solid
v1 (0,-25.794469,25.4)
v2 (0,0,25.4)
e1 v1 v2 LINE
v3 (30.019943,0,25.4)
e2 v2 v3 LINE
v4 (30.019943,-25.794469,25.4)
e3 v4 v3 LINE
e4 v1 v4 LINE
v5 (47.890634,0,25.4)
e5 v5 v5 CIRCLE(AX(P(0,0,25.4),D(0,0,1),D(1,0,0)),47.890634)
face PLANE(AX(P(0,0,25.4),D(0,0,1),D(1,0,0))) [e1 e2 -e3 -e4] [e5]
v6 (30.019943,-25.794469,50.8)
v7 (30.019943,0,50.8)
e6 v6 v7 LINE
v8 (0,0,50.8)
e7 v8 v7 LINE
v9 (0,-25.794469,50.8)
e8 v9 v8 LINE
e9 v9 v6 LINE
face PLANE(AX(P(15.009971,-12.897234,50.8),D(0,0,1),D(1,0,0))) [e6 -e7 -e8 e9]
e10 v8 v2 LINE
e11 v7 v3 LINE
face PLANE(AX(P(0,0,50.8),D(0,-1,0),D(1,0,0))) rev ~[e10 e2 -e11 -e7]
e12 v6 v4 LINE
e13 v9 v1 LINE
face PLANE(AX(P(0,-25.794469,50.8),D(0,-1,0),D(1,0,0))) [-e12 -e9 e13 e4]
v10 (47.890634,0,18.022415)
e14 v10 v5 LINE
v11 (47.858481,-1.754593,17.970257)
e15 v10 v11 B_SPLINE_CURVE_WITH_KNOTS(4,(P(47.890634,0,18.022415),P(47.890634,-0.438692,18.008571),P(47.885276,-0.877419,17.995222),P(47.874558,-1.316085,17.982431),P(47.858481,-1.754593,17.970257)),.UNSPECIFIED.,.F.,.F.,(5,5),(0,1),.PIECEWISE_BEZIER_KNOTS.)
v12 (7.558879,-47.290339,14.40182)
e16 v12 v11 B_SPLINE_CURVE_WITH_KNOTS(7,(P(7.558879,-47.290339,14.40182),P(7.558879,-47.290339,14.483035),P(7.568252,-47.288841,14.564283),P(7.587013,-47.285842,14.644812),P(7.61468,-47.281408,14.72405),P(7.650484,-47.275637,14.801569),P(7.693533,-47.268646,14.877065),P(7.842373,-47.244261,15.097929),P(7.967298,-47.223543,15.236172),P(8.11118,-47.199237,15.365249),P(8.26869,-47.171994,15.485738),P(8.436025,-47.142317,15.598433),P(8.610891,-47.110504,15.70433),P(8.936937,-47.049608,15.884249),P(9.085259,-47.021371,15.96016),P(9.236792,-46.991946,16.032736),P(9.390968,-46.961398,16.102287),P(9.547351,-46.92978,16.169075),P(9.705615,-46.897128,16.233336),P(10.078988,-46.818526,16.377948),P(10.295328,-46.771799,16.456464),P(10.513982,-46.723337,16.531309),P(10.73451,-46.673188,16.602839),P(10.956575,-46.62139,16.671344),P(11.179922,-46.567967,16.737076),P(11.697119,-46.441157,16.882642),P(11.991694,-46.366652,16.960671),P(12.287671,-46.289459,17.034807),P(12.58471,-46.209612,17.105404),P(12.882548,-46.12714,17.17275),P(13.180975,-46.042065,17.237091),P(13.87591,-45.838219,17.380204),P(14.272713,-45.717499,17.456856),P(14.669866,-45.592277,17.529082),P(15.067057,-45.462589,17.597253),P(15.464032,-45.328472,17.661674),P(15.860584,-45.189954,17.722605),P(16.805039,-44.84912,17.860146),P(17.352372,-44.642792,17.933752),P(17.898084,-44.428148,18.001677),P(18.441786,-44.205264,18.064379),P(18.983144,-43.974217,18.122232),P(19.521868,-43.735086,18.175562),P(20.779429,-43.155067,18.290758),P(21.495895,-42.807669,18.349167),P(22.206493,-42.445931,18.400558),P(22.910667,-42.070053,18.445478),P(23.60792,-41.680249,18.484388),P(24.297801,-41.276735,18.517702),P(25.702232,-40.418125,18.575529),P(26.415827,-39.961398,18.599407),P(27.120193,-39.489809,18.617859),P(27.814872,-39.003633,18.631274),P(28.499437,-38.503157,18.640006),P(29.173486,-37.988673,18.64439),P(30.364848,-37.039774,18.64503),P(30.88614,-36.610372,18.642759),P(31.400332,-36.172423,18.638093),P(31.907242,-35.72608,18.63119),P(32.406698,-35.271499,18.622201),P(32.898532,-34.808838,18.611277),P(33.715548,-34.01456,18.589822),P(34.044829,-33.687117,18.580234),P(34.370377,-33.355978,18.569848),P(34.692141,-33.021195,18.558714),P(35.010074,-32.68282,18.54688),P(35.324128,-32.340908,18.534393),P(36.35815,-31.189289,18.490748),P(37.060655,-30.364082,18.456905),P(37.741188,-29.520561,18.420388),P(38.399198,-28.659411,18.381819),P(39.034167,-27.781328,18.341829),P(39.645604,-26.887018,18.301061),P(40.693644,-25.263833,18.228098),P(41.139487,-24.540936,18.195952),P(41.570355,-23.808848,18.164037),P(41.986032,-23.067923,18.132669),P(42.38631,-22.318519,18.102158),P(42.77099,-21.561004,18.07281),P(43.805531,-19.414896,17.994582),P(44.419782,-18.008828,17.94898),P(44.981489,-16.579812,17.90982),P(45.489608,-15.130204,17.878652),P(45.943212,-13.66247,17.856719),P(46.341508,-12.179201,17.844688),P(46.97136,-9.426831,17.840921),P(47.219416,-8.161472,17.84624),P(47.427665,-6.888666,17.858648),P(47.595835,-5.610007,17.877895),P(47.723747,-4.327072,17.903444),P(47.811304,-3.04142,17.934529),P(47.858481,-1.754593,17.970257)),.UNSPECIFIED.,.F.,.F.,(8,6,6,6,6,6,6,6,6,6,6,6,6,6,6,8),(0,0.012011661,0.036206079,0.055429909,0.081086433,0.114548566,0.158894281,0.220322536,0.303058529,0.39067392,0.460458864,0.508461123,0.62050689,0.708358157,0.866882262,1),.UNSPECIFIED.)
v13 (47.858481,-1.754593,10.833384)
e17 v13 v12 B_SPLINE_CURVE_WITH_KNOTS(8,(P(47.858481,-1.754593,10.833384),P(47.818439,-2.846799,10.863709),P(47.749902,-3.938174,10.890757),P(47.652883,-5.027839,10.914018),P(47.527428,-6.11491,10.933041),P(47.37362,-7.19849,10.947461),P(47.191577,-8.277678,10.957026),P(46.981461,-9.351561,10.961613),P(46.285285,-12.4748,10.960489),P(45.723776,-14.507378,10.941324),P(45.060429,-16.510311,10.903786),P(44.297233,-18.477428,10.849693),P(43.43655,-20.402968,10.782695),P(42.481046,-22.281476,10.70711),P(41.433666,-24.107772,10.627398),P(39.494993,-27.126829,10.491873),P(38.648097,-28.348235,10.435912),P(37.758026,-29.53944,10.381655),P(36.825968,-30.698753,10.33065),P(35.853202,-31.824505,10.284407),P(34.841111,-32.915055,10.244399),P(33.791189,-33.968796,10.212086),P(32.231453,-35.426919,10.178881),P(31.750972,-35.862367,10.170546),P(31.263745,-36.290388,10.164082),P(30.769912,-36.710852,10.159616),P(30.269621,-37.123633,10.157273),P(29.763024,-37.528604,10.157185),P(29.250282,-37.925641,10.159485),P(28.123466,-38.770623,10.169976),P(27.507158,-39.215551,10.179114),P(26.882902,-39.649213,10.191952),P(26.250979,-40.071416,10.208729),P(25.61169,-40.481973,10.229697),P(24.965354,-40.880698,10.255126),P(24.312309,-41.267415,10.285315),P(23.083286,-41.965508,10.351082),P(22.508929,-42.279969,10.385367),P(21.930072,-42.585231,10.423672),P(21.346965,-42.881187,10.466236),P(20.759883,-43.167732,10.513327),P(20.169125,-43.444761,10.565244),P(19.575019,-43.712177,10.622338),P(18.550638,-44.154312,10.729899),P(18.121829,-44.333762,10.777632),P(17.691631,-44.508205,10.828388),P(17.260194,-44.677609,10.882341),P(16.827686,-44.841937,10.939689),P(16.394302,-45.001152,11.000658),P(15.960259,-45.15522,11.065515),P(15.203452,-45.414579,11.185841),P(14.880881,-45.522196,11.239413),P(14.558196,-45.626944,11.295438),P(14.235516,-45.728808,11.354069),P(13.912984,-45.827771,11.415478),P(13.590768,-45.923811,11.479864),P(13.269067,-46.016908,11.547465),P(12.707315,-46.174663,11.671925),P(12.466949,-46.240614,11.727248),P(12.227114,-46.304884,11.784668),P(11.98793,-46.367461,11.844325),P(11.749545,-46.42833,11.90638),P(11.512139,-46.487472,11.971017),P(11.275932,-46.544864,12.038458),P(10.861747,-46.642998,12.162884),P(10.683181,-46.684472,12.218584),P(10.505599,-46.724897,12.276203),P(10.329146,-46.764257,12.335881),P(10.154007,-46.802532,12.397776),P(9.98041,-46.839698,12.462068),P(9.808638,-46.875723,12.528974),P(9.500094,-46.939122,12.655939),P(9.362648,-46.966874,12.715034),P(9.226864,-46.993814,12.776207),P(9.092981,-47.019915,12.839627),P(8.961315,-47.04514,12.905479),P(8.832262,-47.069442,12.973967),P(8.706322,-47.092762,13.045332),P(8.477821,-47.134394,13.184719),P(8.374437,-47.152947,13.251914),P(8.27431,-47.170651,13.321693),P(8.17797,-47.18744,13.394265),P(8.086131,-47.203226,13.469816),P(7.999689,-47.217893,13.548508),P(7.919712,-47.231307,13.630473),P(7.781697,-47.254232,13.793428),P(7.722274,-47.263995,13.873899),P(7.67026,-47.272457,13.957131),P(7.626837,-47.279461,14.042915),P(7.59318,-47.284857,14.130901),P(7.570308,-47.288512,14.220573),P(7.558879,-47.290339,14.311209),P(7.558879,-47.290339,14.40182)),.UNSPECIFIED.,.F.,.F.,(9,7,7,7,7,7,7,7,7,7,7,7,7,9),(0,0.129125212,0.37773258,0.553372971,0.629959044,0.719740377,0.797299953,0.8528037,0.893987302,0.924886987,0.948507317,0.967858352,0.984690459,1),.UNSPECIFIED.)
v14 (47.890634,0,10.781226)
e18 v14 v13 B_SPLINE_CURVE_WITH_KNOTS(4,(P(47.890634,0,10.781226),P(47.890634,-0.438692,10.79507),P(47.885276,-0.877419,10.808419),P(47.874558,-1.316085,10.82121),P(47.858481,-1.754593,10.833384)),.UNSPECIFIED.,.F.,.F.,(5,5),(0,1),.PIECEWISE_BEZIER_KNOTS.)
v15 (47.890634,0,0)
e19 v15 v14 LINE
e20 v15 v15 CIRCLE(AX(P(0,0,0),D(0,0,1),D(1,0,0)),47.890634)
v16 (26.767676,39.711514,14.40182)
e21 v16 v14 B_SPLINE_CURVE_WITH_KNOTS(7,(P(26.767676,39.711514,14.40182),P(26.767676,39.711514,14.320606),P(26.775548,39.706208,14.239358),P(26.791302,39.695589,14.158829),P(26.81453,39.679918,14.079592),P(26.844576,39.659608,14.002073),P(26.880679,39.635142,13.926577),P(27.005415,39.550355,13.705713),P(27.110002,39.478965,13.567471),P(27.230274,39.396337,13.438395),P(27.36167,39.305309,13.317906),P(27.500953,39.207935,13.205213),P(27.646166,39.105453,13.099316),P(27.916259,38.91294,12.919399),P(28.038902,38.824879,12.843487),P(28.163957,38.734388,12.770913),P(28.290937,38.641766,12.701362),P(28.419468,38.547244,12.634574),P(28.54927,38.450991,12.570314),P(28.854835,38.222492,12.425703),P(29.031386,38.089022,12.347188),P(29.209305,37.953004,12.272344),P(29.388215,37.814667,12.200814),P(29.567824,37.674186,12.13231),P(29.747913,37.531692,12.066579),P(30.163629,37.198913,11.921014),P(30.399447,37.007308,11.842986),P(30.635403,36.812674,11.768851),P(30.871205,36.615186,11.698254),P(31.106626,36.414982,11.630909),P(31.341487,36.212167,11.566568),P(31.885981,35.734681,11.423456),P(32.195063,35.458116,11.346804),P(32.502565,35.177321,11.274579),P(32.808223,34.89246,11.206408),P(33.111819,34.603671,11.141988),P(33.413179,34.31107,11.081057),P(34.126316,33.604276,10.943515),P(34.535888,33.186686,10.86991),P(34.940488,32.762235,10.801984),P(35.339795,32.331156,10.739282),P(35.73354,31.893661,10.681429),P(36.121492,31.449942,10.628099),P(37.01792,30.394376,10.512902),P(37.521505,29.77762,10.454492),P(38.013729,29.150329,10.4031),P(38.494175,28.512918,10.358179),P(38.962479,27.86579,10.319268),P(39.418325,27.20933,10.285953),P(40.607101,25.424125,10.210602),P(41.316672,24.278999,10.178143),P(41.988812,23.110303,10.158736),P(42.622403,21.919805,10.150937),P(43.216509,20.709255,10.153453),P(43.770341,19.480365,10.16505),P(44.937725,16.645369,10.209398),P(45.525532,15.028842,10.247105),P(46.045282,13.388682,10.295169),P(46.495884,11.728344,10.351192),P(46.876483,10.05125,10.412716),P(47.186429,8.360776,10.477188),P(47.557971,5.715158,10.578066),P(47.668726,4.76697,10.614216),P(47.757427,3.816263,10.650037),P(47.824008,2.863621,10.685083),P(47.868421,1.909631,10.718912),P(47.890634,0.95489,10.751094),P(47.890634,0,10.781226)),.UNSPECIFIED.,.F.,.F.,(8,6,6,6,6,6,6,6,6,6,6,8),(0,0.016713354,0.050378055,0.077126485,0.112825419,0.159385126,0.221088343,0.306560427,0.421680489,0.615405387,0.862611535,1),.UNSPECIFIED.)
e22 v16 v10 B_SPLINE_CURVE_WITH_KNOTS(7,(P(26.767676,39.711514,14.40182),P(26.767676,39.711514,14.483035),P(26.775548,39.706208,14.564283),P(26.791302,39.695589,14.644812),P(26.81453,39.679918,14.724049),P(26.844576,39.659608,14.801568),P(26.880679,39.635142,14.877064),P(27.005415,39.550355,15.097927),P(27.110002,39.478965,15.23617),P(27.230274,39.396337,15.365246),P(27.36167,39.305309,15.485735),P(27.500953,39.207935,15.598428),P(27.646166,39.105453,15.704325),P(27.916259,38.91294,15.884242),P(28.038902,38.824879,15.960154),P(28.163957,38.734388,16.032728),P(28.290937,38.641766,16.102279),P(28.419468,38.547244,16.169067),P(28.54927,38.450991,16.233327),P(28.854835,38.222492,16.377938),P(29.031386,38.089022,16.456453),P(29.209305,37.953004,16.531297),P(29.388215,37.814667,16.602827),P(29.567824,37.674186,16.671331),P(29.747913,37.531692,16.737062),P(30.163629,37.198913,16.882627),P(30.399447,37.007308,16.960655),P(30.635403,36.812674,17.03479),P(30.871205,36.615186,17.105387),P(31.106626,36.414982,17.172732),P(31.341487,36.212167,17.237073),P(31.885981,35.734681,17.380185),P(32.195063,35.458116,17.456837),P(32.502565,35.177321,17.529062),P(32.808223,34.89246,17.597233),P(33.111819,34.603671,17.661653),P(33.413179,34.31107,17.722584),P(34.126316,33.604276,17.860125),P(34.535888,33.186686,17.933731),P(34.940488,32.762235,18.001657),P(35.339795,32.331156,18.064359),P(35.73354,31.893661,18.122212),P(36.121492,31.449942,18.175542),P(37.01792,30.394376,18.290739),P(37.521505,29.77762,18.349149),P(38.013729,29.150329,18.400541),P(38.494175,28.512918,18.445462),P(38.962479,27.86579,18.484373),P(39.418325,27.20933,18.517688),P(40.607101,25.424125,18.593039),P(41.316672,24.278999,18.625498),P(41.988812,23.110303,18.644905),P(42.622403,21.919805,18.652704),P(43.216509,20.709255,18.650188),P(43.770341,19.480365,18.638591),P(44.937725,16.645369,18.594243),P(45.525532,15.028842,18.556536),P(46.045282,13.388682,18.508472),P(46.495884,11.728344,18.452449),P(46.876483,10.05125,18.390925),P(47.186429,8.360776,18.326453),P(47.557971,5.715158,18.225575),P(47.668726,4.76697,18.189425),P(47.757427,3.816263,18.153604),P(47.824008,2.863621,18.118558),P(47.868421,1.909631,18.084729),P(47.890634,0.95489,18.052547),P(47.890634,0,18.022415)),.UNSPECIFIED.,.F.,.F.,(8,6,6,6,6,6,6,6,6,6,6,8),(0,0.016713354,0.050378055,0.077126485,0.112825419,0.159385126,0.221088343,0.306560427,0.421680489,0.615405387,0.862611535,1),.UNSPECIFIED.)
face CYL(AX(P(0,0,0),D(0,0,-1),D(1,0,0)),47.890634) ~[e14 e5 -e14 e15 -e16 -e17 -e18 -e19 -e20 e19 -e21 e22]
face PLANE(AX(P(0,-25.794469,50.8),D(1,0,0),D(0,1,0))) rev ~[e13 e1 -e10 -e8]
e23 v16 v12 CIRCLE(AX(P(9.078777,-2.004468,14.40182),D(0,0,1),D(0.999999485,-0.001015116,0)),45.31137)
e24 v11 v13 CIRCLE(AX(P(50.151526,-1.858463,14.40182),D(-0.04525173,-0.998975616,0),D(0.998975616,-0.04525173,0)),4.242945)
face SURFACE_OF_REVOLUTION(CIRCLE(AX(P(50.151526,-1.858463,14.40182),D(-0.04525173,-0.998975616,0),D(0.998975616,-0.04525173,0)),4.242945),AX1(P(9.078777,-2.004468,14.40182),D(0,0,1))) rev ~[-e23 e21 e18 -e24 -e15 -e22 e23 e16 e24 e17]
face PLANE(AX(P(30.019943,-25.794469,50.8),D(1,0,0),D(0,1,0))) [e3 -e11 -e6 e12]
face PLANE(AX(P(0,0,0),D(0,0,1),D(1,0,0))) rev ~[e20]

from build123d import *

# Parameters (mm, degrees)
F1_R     = 47.8906341697
F3_DEPTH = 25.4
F2_W     = 30.0199426711
F2_H     = 25.7944688201
F4_DEPTH = 25.4
F7_R     = 4.2429445986


# Not quite as in the source:
# - a feature of the source that left no trace in its solid (it failed there, or was rolled back) is left out


with BuildPart() as f3:
    # F1 (on Top) → F3 (new body)
    with BuildSketch(Plane.XY):
        Circle(F1_R)
    extrude(amount=F3_DEPTH)

    # F2 (on offset) → F4 (join)
    with BuildSketch(Plane.XY.offset(50.8)):
        with Locations((15.0099713355, -12.89723441)):
            Rectangle(F2_W, F2_H)
    extrude(amount=-F4_DEPTH)

    # F8: sweep along a path in F6
    with BuildLine(Plane.XY.offset(12.7)) as f8_path:
        CenterArc((9.0787773952, -2.0044676494), 44.2959341801, 0, 360)
    # F7 (on Front) → F8 (sweep, cut)
    with BuildSketch(Plane.XZ):
        with Locations((50.1028448343, 14.4018204883)):
            Circle(F7_R)
    sweep(path=f8_path.line, mode=Mode.SUBTRACT)


solid = f3.part
